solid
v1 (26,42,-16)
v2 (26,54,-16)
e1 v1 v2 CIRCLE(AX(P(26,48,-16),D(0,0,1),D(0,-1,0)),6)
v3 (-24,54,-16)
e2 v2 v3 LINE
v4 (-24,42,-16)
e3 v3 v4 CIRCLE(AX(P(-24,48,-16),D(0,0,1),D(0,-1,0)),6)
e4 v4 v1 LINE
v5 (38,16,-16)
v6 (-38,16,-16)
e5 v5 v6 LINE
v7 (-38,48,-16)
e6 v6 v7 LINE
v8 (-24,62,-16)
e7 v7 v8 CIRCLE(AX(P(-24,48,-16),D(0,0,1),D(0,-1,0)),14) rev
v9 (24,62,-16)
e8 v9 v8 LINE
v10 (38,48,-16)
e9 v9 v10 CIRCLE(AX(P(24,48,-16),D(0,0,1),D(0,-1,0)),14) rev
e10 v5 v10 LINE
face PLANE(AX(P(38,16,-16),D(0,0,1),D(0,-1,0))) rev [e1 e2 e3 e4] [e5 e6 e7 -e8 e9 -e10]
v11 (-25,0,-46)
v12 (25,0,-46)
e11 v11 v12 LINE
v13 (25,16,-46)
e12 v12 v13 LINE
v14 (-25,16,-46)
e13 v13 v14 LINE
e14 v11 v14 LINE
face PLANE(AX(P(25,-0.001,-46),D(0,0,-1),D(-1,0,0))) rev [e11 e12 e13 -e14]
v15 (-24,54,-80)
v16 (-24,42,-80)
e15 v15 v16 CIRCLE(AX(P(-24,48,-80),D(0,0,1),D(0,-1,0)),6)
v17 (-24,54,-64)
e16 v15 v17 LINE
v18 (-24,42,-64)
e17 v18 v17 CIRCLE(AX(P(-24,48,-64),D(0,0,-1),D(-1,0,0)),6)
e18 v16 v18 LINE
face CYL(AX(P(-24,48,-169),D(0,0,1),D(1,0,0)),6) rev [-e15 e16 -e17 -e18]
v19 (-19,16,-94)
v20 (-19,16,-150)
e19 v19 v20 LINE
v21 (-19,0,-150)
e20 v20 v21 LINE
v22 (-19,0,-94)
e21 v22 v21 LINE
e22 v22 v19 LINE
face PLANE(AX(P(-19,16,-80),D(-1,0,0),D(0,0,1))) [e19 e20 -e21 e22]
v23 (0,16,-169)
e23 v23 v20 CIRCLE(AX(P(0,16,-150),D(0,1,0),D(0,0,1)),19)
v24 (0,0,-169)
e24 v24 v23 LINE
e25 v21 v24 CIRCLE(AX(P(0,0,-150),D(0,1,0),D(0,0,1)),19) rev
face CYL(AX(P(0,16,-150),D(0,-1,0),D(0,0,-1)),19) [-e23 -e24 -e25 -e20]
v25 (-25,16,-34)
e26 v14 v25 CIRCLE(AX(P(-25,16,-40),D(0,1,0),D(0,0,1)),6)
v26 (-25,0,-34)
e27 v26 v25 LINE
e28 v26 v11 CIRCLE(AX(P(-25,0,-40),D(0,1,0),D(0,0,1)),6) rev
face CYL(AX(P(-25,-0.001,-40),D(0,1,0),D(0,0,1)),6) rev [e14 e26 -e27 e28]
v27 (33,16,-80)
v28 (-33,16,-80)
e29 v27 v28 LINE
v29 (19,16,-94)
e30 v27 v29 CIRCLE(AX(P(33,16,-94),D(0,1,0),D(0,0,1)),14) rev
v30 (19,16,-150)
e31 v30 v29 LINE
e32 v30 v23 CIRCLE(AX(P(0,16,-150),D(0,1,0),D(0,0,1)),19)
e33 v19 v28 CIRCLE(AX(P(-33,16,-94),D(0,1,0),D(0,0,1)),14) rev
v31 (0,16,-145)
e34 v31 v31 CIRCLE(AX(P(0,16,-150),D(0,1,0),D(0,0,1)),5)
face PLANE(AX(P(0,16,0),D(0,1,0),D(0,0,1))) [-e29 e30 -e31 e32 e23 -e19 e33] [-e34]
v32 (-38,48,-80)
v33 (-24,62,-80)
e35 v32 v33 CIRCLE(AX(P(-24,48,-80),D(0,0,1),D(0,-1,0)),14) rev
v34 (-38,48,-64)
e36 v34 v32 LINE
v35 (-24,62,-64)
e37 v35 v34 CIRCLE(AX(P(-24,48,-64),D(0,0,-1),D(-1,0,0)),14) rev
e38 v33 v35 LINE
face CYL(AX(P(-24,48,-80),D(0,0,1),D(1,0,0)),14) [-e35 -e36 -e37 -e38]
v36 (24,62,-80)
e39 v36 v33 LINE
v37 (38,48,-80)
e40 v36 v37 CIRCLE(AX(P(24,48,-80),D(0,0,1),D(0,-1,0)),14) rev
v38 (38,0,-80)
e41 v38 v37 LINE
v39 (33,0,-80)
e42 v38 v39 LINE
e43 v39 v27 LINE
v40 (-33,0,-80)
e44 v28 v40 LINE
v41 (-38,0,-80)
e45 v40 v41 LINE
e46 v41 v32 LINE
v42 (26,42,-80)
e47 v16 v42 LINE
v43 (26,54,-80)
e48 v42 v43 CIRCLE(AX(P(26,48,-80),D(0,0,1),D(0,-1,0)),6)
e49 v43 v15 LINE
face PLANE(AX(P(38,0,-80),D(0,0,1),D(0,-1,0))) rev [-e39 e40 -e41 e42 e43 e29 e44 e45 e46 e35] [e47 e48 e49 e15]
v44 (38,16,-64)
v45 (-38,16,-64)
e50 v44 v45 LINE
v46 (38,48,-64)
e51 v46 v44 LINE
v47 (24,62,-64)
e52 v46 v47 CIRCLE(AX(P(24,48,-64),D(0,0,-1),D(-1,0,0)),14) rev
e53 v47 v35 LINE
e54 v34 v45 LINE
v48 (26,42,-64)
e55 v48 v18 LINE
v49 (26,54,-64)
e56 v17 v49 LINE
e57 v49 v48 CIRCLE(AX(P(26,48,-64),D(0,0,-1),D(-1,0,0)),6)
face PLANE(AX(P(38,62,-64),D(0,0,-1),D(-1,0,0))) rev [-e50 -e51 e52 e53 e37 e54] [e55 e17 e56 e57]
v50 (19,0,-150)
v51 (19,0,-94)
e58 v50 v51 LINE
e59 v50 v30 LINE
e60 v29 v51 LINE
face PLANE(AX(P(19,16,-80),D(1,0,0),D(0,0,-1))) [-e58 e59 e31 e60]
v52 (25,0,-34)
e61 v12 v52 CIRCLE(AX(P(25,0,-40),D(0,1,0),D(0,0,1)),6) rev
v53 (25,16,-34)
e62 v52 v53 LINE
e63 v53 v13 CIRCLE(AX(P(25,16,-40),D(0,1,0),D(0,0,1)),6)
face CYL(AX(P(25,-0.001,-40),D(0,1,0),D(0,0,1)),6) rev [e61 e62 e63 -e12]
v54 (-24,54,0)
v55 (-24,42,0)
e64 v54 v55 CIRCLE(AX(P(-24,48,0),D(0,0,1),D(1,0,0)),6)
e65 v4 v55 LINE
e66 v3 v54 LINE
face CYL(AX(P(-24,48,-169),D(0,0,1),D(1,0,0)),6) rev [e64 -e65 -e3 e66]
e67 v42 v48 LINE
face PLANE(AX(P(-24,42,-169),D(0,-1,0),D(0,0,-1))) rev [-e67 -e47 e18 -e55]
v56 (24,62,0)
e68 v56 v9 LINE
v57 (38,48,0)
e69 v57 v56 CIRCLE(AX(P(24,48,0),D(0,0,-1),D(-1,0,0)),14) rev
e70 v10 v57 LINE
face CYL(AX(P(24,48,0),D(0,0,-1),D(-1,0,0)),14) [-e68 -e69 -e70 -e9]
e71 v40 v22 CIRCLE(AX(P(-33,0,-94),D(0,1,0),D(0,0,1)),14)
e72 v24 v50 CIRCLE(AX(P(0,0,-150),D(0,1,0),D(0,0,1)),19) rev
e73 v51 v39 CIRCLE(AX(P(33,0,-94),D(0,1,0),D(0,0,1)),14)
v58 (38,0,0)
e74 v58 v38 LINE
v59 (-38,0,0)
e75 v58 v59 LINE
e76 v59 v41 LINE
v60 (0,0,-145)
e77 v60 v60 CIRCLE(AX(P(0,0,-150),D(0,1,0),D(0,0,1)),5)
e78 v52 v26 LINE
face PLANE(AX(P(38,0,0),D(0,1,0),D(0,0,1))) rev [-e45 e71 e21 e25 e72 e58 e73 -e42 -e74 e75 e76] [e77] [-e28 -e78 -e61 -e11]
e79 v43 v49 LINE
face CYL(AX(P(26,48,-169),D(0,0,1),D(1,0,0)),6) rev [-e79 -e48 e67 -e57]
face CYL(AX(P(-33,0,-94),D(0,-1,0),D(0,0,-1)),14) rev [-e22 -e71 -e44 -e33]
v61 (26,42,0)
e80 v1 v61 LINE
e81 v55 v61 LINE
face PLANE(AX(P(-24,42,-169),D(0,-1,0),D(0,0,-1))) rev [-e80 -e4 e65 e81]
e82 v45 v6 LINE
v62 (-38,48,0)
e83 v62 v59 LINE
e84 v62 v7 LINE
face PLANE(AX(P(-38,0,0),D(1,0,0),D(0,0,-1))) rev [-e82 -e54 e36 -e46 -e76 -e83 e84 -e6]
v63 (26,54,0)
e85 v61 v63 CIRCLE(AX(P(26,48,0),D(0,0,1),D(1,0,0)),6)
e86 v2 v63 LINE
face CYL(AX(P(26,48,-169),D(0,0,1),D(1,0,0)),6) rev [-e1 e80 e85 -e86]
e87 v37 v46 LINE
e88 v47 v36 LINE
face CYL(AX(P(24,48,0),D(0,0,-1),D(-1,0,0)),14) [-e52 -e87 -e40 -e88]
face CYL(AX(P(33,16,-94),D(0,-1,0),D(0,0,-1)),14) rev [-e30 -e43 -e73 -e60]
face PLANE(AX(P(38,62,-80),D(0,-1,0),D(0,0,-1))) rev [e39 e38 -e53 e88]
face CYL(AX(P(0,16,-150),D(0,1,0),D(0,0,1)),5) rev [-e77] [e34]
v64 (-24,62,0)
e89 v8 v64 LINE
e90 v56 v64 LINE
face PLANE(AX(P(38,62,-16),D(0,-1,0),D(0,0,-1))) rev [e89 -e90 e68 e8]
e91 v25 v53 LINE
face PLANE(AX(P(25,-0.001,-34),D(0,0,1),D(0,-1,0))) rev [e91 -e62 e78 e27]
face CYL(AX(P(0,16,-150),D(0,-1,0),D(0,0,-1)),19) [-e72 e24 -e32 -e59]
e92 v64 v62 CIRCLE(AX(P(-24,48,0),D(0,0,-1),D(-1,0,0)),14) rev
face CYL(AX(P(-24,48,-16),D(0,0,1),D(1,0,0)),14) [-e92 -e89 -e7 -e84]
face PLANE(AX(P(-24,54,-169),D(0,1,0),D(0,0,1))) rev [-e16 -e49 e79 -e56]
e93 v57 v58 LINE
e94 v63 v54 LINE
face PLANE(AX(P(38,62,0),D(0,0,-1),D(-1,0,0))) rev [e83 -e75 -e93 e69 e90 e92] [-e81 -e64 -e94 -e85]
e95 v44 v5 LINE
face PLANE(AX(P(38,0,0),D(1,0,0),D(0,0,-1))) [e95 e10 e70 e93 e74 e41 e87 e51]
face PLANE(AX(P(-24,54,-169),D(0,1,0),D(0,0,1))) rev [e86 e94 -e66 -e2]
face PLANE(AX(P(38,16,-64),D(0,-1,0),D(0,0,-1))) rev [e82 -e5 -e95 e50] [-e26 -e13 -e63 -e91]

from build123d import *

# Parameters (mm, degrees)
ESTRUSIONE_ESTRUSIONE1_DEPTH = 38
SCHIZZO3_W                   = 38
SCHIZZO3_H                   = 89
ESTRUSIONE_ESTRUSIONE2_DEPTH = 16
RACCORDO1_R                  = 19
RACCORDO2_R                  = 14
TAGLIO_ESTRUSIONE1_REACH     = 181.223
TAGLIO_ESTRUSIONE2_DEPTH     = 184.980977278
FORO_10_0_10_2_D             = 10
RACCORDO3_R                  = 14


with BuildPart() as part:
    # Schizzo2 → Estrusione-Estrusione1 (new, symmetric)
    with BuildSketch(Plane(origin=(0, 0, 0), x_dir=(0, 0, -1), z_dir=(1, 0, 0))):
        Polygon((0, 62), (0, 0), (80, 0), (80, 62), (64, 62), (64, 16), (16, 16), (16, 62), align=None)
    extrude(amount=ESTRUSIONE_ESTRUSIONE1_DEPTH, both=True)

    # Schizzo3 → Estrusione-Estrusione2 (add)
    with BuildSketch(Plane.XZ):
        with Locations((0, -124.5)):
            Rectangle(SCHIZZO3_W, SCHIZZO3_H)
    extrude(amount=-ESTRUSIONE_ESTRUSIONE2_DEPTH)

    # Raccordo1
    raccordo1_edges = [part.edges().sort_by_distance(p)[0] for p in [
        (19, 8, -169),
        (-19, 8, -169),
    ]]
    fillet(raccordo1_edges, radius=RACCORDO1_R - 0.0001)  # a hair under: the kernel refuses the full size

    # Raccordo2
    raccordo2_edges = [part.edges().sort_by_distance(p)[0] for p in [
        (-38, 62, -8),
        (38, 62, -72),
        (38, 62, -8),
        (-38, 62, -72),
    ]]
    fillet(raccordo2_edges, radius=RACCORDO2_R)

    # Schizzo4 → Taglio-Estrusione1 (cut, up to next)
    with BuildSketch(Plane(origin=(0, 16, 0), x_dir=(1, 0, 0), z_dir=(0, 1, 0)), mode=Mode.PRIVATE) as taglio_estrusione1_sk1:
        with BuildLine():
            Line((25, 34), (-25, 34))
            ThreePointArc((-25, 34), (-31, 40), (-25, 46))
            Line((-25, 46), (25, 46))
            ThreePointArc((25, 46), (31, 40), (25, 34))
        make_face()
    taglio_estrusione1_tool1 = extrude(taglio_estrusione1_sk1.sketch, amount=-TAGLIO_ESTRUSIONE1_REACH, mode=Mode.PRIVATE) & part.part
    add(taglio_estrusione1_tool1.solids().sort_by_distance((0, 16, -40))[0], mode=Mode.SUBTRACT)

    # Schizzo5 → Taglio-Estrusione2 (cut, through all)
    with BuildSketch(Plane.XY):
        with BuildLine():
            Line((-24, 54), (26, 54))
            ThreePointArc((26, 54), (32, 48), (26, 42))
            Line((26, 42), (-24, 42))
            ThreePointArc((-24, 42), (-30, 48), (-24, 54))
        make_face()
    extrude(amount=-TAGLIO_ESTRUSIONE2_DEPTH, mode=Mode.SUBTRACT)

    # Foro Ø10.0 (10)-2 (through all)
    with Locations(Plane(origin=(0, 16, 0), x_dir=(1, 0, 0), z_dir=(0, 1, 0))):
        with Locations((0, 150)):
            Hole(FORO_10_0_10_2_D / 2)

    # Raccordo3
    raccordo3_edges = [part.edges().sort_by_distance(p)[0] for p in [
        (-19, 8, -80),
        (19, 8, -80),
    ]]
    fillet(raccordo3_edges, radius=RACCORDO3_R)


solid = part.part
